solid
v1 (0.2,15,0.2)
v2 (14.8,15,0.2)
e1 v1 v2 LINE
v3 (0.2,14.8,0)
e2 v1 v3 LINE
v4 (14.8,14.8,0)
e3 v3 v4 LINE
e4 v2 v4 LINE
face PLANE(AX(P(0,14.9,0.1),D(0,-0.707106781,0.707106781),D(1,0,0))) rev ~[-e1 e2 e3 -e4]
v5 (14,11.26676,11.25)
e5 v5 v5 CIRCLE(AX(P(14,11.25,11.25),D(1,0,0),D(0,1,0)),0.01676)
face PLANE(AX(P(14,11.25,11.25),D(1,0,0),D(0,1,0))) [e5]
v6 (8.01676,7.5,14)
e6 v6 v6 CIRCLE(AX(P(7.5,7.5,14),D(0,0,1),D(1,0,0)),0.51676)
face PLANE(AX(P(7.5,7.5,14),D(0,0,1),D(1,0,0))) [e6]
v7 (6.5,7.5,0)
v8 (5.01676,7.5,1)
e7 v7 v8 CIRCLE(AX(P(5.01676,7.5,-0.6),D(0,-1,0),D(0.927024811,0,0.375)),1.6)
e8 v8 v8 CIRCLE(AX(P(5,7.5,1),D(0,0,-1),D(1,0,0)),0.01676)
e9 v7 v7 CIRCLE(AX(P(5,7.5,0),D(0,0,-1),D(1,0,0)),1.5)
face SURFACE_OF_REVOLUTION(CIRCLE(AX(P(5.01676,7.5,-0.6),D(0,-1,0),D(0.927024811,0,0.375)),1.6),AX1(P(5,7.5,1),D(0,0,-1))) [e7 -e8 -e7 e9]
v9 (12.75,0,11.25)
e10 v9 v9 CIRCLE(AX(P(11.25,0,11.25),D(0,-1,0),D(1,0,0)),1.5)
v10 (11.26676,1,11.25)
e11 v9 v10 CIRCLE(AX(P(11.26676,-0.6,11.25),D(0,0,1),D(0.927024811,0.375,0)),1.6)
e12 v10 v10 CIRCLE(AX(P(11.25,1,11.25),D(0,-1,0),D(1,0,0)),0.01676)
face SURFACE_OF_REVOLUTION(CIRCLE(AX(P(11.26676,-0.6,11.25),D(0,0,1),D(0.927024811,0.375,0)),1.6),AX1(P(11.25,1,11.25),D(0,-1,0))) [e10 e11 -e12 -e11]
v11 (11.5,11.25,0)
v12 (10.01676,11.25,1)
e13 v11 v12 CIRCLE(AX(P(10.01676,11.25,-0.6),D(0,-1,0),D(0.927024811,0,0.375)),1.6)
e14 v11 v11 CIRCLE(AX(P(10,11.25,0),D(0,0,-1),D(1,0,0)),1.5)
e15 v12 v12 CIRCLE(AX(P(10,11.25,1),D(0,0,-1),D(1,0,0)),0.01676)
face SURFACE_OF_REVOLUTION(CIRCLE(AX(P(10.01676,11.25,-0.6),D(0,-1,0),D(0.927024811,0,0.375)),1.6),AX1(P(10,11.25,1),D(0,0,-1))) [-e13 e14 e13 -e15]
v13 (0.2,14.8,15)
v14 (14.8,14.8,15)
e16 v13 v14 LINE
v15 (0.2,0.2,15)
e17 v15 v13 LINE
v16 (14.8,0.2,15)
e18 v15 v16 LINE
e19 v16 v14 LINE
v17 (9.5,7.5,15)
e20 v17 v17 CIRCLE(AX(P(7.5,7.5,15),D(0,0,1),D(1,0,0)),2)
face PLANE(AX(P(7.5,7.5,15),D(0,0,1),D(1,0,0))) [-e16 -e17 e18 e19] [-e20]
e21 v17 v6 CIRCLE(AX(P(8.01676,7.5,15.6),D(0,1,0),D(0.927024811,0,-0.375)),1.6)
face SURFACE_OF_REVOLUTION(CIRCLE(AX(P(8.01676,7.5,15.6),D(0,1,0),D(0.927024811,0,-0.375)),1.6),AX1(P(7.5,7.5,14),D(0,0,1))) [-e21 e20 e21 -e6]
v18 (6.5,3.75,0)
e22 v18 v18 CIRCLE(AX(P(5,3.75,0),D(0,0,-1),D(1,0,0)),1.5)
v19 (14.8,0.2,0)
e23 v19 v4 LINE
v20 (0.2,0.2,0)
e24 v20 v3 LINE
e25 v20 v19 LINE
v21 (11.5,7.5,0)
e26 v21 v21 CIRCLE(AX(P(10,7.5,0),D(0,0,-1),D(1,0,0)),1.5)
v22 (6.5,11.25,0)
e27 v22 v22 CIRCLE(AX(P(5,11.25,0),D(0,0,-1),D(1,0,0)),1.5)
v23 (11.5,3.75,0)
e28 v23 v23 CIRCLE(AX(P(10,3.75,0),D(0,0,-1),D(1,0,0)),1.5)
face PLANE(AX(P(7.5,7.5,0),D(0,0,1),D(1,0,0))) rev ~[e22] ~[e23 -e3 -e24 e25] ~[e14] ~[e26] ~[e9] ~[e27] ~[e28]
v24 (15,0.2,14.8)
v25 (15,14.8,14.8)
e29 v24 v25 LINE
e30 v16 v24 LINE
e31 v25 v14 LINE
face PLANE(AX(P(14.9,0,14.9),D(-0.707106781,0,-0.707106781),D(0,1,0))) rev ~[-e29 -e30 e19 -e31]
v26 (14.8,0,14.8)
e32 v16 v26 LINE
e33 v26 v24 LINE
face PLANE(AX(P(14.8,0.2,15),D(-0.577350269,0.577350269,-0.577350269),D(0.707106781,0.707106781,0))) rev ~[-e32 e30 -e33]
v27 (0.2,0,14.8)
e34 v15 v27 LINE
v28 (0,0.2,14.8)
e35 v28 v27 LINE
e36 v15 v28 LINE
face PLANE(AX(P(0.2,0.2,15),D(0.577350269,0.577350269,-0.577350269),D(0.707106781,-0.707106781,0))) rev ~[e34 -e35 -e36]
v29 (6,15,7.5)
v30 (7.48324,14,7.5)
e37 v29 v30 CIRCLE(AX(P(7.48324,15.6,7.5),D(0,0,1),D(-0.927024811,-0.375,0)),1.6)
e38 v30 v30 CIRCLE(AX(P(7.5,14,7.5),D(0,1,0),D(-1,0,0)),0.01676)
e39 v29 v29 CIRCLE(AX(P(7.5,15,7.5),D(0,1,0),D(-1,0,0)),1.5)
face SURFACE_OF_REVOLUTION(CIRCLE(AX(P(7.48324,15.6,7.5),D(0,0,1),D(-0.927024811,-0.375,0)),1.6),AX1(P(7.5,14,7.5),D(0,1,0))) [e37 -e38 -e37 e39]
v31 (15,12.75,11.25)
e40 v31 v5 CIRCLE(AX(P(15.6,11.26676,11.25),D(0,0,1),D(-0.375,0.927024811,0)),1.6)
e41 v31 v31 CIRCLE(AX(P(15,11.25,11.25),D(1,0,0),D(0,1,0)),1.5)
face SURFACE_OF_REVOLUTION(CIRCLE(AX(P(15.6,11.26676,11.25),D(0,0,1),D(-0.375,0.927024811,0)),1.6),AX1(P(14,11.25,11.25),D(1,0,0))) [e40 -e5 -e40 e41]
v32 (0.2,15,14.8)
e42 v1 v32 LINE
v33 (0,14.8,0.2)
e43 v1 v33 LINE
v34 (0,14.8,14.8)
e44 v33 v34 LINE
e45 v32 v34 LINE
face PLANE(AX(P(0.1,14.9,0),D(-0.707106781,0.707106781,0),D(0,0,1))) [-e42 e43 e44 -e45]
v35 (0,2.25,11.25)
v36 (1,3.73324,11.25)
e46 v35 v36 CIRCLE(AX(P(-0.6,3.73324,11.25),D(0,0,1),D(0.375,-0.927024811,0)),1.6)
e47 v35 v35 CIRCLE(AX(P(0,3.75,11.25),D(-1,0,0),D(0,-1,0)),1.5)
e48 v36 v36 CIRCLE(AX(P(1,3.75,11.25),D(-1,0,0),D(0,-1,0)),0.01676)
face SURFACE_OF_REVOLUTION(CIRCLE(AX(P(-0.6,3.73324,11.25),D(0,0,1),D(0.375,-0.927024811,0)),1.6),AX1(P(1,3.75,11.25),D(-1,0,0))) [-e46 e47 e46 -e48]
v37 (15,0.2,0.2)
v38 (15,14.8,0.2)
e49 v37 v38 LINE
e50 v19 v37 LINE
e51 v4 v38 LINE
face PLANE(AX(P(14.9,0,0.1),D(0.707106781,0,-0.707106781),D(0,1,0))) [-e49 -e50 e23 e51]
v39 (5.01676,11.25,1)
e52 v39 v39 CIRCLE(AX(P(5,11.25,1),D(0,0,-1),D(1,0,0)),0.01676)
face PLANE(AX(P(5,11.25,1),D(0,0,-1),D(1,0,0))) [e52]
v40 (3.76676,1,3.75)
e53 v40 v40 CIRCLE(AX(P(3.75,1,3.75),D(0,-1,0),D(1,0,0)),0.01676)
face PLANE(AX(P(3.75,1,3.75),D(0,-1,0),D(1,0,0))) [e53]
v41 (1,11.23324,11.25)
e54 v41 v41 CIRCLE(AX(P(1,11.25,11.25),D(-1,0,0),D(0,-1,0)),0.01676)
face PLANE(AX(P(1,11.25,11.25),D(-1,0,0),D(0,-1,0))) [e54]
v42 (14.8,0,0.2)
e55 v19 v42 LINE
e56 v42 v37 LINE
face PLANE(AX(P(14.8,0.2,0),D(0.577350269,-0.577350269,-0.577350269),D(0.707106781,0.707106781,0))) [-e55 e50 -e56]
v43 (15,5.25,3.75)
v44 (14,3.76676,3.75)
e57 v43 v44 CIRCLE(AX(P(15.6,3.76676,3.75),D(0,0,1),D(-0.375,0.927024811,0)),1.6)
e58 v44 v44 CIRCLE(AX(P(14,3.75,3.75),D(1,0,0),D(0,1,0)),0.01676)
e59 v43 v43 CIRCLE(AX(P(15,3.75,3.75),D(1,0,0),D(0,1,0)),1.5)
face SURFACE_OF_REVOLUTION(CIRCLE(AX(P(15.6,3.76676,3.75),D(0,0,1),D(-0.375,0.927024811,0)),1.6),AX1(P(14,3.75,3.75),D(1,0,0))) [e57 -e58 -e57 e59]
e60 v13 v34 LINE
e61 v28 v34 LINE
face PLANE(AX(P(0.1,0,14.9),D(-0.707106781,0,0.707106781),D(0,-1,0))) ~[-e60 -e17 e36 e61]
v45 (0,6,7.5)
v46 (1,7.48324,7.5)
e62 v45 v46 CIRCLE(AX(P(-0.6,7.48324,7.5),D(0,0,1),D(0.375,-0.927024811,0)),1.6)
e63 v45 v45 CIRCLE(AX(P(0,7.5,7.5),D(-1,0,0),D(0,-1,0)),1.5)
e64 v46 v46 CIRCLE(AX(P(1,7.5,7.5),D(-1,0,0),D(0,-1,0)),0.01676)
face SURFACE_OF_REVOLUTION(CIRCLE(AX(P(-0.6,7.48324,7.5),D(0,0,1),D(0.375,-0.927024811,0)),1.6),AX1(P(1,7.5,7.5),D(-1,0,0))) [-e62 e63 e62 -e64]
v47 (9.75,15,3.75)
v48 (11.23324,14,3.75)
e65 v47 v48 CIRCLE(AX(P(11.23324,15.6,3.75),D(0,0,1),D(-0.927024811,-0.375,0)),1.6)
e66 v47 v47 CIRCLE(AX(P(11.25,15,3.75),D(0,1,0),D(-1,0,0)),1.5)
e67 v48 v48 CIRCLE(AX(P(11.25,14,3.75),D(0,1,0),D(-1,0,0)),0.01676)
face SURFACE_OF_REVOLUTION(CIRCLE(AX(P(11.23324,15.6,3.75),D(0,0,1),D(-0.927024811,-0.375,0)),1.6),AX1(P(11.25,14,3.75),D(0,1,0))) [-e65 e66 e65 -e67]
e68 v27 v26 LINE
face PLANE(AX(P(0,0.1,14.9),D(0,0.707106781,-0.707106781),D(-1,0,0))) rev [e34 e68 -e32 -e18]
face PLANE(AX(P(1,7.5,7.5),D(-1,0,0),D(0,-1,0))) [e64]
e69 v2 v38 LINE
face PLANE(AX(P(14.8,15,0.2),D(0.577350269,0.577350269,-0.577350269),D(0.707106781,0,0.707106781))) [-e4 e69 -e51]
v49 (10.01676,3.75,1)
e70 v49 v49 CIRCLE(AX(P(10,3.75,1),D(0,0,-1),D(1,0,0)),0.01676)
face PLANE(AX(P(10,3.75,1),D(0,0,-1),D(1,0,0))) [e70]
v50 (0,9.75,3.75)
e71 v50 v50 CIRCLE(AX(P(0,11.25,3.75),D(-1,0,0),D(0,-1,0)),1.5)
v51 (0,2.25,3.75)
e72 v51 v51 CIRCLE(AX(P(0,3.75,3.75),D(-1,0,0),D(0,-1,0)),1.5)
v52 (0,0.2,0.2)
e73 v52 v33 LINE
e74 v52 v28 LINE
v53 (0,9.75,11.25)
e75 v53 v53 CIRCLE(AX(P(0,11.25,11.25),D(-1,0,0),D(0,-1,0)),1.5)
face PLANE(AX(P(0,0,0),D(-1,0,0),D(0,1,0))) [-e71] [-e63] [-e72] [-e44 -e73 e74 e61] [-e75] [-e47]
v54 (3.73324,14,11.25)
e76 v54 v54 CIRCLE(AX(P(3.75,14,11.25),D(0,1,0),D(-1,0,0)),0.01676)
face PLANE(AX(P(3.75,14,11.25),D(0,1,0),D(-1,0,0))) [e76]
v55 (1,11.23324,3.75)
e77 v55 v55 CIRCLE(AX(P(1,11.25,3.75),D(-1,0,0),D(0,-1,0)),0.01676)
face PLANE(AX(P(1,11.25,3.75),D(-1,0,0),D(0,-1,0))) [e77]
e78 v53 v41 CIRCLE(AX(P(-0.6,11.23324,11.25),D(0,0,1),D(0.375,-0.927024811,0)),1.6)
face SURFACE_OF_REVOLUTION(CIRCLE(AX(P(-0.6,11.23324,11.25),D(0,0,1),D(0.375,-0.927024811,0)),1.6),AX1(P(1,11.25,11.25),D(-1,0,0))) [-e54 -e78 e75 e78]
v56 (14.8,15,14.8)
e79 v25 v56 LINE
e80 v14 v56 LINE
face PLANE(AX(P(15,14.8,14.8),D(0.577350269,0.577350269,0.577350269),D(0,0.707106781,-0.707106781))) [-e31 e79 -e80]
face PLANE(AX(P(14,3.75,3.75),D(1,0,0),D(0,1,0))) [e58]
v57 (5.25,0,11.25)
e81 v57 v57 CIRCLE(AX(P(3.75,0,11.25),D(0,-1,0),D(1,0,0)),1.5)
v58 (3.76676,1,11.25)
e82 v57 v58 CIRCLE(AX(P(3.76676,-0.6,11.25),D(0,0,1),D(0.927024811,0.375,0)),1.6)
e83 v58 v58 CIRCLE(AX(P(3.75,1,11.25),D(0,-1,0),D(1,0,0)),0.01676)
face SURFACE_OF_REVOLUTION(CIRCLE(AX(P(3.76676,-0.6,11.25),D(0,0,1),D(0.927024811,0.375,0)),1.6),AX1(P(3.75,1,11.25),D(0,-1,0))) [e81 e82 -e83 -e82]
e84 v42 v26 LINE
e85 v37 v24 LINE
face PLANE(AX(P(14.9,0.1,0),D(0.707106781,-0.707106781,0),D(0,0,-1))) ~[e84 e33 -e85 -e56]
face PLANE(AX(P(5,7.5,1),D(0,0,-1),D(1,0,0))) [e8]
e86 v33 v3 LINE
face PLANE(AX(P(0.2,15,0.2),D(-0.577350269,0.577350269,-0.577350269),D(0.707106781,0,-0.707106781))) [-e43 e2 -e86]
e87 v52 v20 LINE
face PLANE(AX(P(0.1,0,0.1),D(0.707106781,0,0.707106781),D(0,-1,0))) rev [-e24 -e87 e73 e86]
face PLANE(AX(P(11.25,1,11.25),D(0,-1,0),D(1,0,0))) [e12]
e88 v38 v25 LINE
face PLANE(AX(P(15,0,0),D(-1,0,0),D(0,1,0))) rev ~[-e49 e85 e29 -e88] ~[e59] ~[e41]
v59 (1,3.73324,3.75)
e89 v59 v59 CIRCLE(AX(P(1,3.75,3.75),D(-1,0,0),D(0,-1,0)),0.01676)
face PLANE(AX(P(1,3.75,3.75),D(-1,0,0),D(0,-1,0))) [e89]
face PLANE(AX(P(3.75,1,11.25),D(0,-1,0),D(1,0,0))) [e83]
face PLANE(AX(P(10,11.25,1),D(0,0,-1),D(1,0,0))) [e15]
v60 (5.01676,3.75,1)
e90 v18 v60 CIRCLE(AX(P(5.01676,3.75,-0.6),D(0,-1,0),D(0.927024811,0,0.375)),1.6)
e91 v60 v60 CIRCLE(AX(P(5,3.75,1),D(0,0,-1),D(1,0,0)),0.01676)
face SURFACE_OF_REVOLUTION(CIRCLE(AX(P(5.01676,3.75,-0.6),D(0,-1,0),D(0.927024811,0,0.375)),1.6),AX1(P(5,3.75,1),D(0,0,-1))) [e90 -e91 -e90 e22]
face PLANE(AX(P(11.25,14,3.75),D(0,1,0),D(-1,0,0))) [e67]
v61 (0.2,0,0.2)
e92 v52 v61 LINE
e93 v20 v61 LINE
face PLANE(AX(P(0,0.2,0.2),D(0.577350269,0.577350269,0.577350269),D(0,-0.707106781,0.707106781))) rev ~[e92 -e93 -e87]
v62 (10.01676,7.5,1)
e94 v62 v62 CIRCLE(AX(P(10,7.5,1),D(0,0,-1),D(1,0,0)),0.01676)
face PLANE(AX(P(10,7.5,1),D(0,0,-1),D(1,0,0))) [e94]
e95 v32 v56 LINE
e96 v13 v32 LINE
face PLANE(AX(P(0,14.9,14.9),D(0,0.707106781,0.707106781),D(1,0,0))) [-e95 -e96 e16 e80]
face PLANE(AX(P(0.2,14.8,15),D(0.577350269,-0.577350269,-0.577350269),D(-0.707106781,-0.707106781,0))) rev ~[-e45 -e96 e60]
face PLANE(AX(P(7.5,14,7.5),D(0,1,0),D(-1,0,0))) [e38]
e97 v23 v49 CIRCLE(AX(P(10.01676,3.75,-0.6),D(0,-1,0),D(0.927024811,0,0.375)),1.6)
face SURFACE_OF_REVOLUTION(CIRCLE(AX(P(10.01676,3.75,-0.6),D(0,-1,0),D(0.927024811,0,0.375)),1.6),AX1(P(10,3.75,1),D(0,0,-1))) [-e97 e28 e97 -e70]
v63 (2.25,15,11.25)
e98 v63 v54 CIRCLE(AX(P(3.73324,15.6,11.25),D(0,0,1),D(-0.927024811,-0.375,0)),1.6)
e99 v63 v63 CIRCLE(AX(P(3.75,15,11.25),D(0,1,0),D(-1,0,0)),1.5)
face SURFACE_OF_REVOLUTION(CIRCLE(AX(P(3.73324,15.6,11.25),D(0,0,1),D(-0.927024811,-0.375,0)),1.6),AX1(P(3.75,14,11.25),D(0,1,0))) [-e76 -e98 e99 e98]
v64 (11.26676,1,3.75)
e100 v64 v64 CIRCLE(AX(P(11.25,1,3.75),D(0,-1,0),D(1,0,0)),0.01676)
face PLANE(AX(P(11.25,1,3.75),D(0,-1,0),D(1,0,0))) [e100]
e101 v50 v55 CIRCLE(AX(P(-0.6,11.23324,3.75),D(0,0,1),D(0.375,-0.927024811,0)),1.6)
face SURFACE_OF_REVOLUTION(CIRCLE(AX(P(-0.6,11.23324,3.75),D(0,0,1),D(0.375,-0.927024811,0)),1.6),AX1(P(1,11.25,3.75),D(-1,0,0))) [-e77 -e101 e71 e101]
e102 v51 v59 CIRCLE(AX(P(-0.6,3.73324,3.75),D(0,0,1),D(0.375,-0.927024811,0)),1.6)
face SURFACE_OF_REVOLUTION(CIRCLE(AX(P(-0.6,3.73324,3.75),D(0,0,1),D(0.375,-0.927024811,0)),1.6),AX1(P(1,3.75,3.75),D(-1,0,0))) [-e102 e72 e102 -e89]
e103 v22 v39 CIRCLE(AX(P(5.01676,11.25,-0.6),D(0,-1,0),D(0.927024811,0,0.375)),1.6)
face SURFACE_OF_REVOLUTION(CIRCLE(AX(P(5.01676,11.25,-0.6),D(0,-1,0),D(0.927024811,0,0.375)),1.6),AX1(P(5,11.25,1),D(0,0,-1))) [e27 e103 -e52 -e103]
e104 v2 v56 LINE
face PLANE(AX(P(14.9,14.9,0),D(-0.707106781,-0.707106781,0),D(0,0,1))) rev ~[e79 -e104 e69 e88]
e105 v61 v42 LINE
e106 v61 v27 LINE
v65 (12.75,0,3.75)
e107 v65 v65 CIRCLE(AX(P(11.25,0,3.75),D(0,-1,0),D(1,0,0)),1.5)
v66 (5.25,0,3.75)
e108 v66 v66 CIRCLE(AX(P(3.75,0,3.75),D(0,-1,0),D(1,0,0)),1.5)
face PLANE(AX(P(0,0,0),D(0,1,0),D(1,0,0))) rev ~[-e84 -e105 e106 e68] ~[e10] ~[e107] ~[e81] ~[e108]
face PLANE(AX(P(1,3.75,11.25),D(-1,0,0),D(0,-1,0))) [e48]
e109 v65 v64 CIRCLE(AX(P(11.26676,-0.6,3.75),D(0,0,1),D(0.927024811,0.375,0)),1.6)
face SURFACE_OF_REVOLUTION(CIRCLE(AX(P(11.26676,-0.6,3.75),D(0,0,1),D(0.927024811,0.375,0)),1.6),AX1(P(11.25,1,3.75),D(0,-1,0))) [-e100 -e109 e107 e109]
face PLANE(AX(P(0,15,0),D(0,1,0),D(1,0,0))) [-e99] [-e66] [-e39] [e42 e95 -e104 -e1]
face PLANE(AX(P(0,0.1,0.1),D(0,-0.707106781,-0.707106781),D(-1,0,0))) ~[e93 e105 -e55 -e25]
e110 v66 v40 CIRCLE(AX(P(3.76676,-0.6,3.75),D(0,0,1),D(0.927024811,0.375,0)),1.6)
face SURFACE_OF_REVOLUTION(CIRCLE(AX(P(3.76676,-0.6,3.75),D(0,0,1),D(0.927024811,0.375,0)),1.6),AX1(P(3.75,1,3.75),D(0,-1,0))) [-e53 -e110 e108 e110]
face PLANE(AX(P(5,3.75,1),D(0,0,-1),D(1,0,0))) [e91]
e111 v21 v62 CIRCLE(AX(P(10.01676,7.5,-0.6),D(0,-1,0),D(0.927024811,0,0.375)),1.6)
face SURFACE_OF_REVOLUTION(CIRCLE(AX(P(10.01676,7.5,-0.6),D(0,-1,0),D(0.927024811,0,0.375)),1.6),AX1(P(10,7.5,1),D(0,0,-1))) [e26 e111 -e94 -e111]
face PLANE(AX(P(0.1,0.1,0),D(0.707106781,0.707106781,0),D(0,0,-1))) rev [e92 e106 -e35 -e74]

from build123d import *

# Parameters (mm, degrees)
F0_W      = 15
F0_H      = 15
F1_DEPTH  = 15
F2_R      = 2
F3_DEPTH  = 1
F4_R      = 1.5
F5_DEPTH  = 1
F6_R      = 1.5
F7_DEPTH  = 1
F8_R      = 1.5
F9_DEPTH  = 1
F10_R     = 1.5
F11_DEPTH = 1
F12_R     = 1.5
F13_DEPTH = 1
F15_SIZE  = 0.2


# Not quite as in the source:
# - a fillet or chamfer that OpenCascade refuses, or shapes differently, is made with other operations: its cross-section is extruded or revolved along the edge and cut away or added


with BuildPart() as f1:
    # F0 (on Top) → F1 (new body)
    with BuildSketch(Plane.XY):
        with Locations((7.5, 7.5)):
            Rectangle(F0_W, F0_H)
    extrude(amount=F1_DEPTH)

    # F2 (on face) → F3 (cut)
    with BuildSketch(Plane.XY.offset(15)):
        with Locations((7.5, 7.5)):
            Circle(F2_R)
    extrude(amount=-F3_DEPTH, mode=Mode.SUBTRACT)

    # F4 (on face) → F5 (cut)
    with BuildSketch(Plane(origin=(0, 0, 0), x_dir=(1, 0, 0), z_dir=(0, 0, -1))):
        with Locations((5, -3.75)):
            Circle(F4_R)
        with Locations((10, -3.75)):
            Circle(F4_R)
        with Locations((10, -7.5)):
            Circle(F4_R)
        with Locations((5, -7.5)):
            Circle(F4_R)
        with Locations((5, -11.25)):
            Circle(F4_R)
        with Locations((10, -11.25)):
            Circle(F4_R)
    extrude(amount=-F5_DEPTH, mode=Mode.SUBTRACT)

    # F6 (on face) → F7 (cut)
    with BuildSketch(Plane.YZ.offset(15)):
        with Locations((3.75, 3.75)):
            Circle(F6_R)
        with Locations((11.25, 11.25)):
            Circle(F6_R)
    extrude(amount=-F7_DEPTH, mode=Mode.SUBTRACT)

    # F8 (on face) → F9 (cut)
    with BuildSketch(Plane(origin=(0, 0, 0), x_dir=(0, -1, 0), z_dir=(-1, 0, 0))):
        with Locations((-11.25, 11.25)):
            Circle(F8_R)
        with Locations((-7.5, 7.5)):
            Circle(F8_R)
        with Locations((-11.25, 3.75)):
            Circle(F8_R)
        with Locations((-3.75, 3.75)):
            Circle(F8_R)
        with Locations((-3.75, 11.25)):
            Circle(F8_R)
    extrude(amount=-F9_DEPTH, mode=Mode.SUBTRACT)

    # F10 (on face) → F11 (cut)
    with BuildSketch(Plane(origin=(0, 15, 0), x_dir=(-1, 0, 0), z_dir=(0, 1, 0))):
        with Locations((-3.75, 11.25)):
            Circle(F10_R)
        with Locations((-7.5, 7.5)):
            Circle(F10_R)
        with Locations((-11.25, 3.75)):
            Circle(F10_R)
    extrude(amount=-F11_DEPTH, mode=Mode.SUBTRACT)

    # F12 (on face) → F13 (cut)
    with BuildSketch(Plane.XZ):
        with Locations((3.75, 11.25)):
            Circle(F12_R)
        with Locations((11.25, 11.25)):
            Circle(F12_R)
        with Locations((11.25, 3.75)):
            Circle(F12_R)
        with Locations((3.75, 3.75)):
            Circle(F12_R)
    extrude(amount=-F13_DEPTH, mode=Mode.SUBTRACT)

    # F14: fillet of radius 1.6 on 21 edges, made by hand

    # F14_s1 → F14_t2 (revolve)
    with BuildSketch(Plane.XY.offset(3.75)):
        with BuildLine():
            ThreePointArc((0, 9.75), (0.7266499161, 10.3388125064), (1, 11.2332396974))
            Line((1, 11.2332396974), (1, 9.75))
            Line((1, 9.75), (0, 9.75))
        make_face()
    revolve(axis=Axis((1, 11.25, 3.75), (-1, 0, 0)))

    # F14_s3 → F14_t4 (revolve)
    with BuildSketch(Plane.XY.offset(7.5)):
        with BuildLine():
            ThreePointArc((0, 6), (0.7266499161, 6.5888125064), (1, 7.4832396974))
            Line((1, 7.4832396974), (1, 6))
            Line((1, 6), (0, 6))
        make_face()
    revolve(axis=Axis((1, 7.5, 7.5), (-1, 0, 0)))

    # F14_s5 → F14_t6 (revolve)
    with BuildSketch(Plane.XY.offset(11.25)):
        with BuildLine():
            ThreePointArc((0, 9.75), (0.7266499161, 10.3388125064), (1, 11.2332396974))
            Line((1, 11.2332396974), (1, 9.75))
            Line((1, 9.75), (0, 9.75))
        make_face()
    revolve(axis=Axis((1, 11.25, 11.25), (-1, 0, 0)))

    # F14_s7 → F14_t8 (revolve)
    with BuildSketch(Plane.XY.offset(3.75)):
        with BuildLine():
            ThreePointArc((0, 2.25), (0.7266499161, 2.8388125064), (1, 3.7332396974))
            Line((1, 3.7332396974), (1, 2.25))
            Line((1, 2.25), (0, 2.25))
        make_face()
    revolve(axis=Axis((1, 3.75, 3.75), (-1, 0, 0)))

    # F14_s9 → F14_t10 (revolve)
    with BuildSketch(Plane.XY.offset(11.25)):
        with BuildLine():
            ThreePointArc((0, 2.25), (0.7266499161, 2.8388125064), (1, 3.7332396974))
            Line((1, 3.7332396974), (1, 2.25))
            Line((1, 2.25), (0, 2.25))
        make_face()
    revolve(axis=Axis((1, 3.75, 11.25), (-1, 0, 0)))

    # F14_s11 → F14_t12 (revolve)
    with BuildSketch(Plane.XY.offset(11.25)):
        with BuildLine():
            ThreePointArc((2.25, 15), (2.8388125064, 14.2733500839), (3.7332396974, 14))
            Line((3.7332396974, 14), (2.25, 14))
            Line((2.25, 14), (2.25, 15))
        make_face()
    revolve(axis=Axis((3.75, 14, 11.25), (0, 1, 0)))

    # F14_s13 → F14_t14 (revolve)
    with BuildSketch(Plane.XY.offset(7.5)):
        with BuildLine():
            ThreePointArc((6, 15), (6.5888125064, 14.2733500839), (7.4832396974, 14))
            Line((7.4832396974, 14), (6, 14))
            Line((6, 14), (6, 15))
        make_face()
    revolve(axis=Axis((7.5, 14, 7.5), (0, 1, 0)))

    # F14_s15 → F14_t16 (revolve)
    with BuildSketch(Plane.XY.offset(3.75)):
        with BuildLine():
            ThreePointArc((9.75, 15), (10.3388125064, 14.2733500839), (11.2332396974, 14))
            Line((11.2332396974, 14), (9.75, 14))
            Line((9.75, 14), (9.75, 15))
        make_face()
    revolve(axis=Axis((11.25, 14, 3.75), (0, 1, 0)))

    # F14_s17 → F14_t18 (revolve)
    with BuildSketch(Plane.XZ.offset(-11.25)):
        with BuildLine():
            ThreePointArc((11.5, 0), (10.9111874936, 0.7266499161), (10.0167603026, 1))
            Line((10.0167603026, 1), (11.5, 1))
            Line((11.5, 1), (11.5, 0))
        make_face()
    revolve(axis=Axis((10, 11.25, 1), (0, 0, -1)))

    # F14_s19 → F14_t20 (revolve)
    with BuildSketch(Plane.XZ.offset(-7.5)):
        with BuildLine():
            ThreePointArc((11.5, 0), (10.9111874936, 0.7266499161), (10.0167603026, 1))
            Line((10.0167603026, 1), (11.5, 1))
            Line((11.5, 1), (11.5, 0))
        make_face()
    revolve(axis=Axis((10, 7.5, 1), (0, 0, -1)))

    # F14_s21 → F14_t22 (revolve)
    with BuildSketch(Plane.XZ.offset(-11.25)):
        with BuildLine():
            ThreePointArc((6.5, 0), (5.9111874936, 0.7266499161), (5.0167603026, 1))
            Line((5.0167603026, 1), (6.5, 1))
            Line((6.5, 1), (6.5, 0))
        make_face()
    revolve(axis=Axis((5, 11.25, 1), (0, 0, -1)))

    # F14_s23 → F14_t24 (revolve)
    with BuildSketch(Plane.XZ.offset(-7.5)):
        with BuildLine():
            ThreePointArc((6.5, 0), (5.9111874936, 0.7266499161), (5.0167603026, 1))
            Line((5.0167603026, 1), (6.5, 1))
            Line((6.5, 1), (6.5, 0))
        make_face()
    revolve(axis=Axis((5, 7.5, 1), (0, 0, -1)))

    # F14_s25 → F14_t26 (revolve)
    with BuildSketch(Plane.XZ.offset(-3.75)):
        with BuildLine():
            ThreePointArc((6.5, 0), (5.9111874936, 0.7266499161), (5.0167603026, 1))
            Line((5.0167603026, 1), (6.5, 1))
            Line((6.5, 1), (6.5, 0))
        make_face()
    revolve(axis=Axis((5, 3.75, 1), (0, 0, -1)))

    # F14_s27 → F14_t28 (revolve)
    with BuildSketch(Plane.XZ.offset(-3.75)):
        with BuildLine():
            ThreePointArc((11.5, 0), (10.9111874936, 0.7266499161), (10.0167603026, 1))
            Line((10.0167603026, 1), (11.5, 1))
            Line((11.5, 1), (11.5, 0))
        make_face()
    revolve(axis=Axis((10, 3.75, 1), (0, 0, -1)))

    # F14_s29 → F14_t30 (revolve)
    with BuildSketch(Plane.XY.offset(3.75)):
        with BuildLine():
            ThreePointArc((15, 5.25), (14.2733500839, 4.6611874936), (14, 3.7667603026))
            Line((14, 3.7667603026), (14, 5.25))
            Line((14, 5.25), (15, 5.25))
        make_face()
    revolve(axis=Axis((14, 3.75, 3.75), (1, 0, 0)))

    # F14_s31 → F14_t32 (revolve)
    with BuildSketch(Plane.XY.offset(11.25)):
        with BuildLine():
            ThreePointArc((15, 12.75), (14.2733500839, 12.1611874936), (14, 11.2667603026))
            Line((14, 11.2667603026), (14, 12.75))
            Line((14, 12.75), (15, 12.75))
        make_face()
    revolve(axis=Axis((14, 11.25, 11.25), (1, 0, 0)))

    # F14_s33 → F14_t34 (revolve)
    with BuildSketch(Plane.XZ.offset(-7.5)):
        with BuildLine():
            ThreePointArc((9.5, 15), (8.9111874936, 14.2733500839), (8.0167603026, 14))
            Line((8.0167603026, 14), (9.5, 14))
            Line((9.5, 14), (9.5, 15))
        make_face()
    revolve(axis=Axis((7.5, 7.5, 14), (0, 0, 1)))

    # F14_s35 → F14_t36 (revolve)
    with BuildSketch(Plane.XY.offset(11.25)):
        with BuildLine():
            ThreePointArc((5.25, 0), (4.6611874936, 0.7266499161), (3.7667603026, 1))
            Line((3.7667603026, 1), (5.25, 1))
            Line((5.25, 1), (5.25, 0))
        make_face()
    revolve(axis=Axis((3.75, 1, 11.25), (0, -1, 0)))

    # F14_s37 → F14_t38 (revolve)
    with BuildSketch(Plane.XY.offset(11.25)):
        with BuildLine():
            ThreePointArc((12.75, 0), (12.1611874936, 0.7266499161), (11.2667603026, 1))
            Line((11.2667603026, 1), (12.75, 1))
            Line((12.75, 1), (12.75, 0))
        make_face()
    revolve(axis=Axis((11.25, 1, 11.25), (0, -1, 0)))

    # F14_s39 → F14_t40 (revolve)
    with BuildSketch(Plane.XY.offset(3.75)):
        with BuildLine():
            ThreePointArc((12.75, 0), (12.1611874936, 0.7266499161), (11.2667603026, 1))
            Line((11.2667603026, 1), (12.75, 1))
            Line((12.75, 1), (12.75, 0))
        make_face()
    revolve(axis=Axis((11.25, 1, 3.75), (0, -1, 0)))

    # F14_s41 → F14_t42 (revolve)
    with BuildSketch(Plane.XY.offset(3.75)):
        with BuildLine():
            ThreePointArc((5.25, 0), (4.6611874936, 0.7266499161), (3.7667603026, 1))
            Line((3.7667603026, 1), (5.25, 1))
            Line((5.25, 1), (5.25, 0))
        make_face()
    revolve(axis=Axis((3.75, 1, 3.75), (0, -1, 0)))

    # F15
    f15_edges = [f1.edges().sort_by_distance(p)[0] for p in [
        (15, 0, 7.5),
        (7.5, 0, 0),
        (15, 7.5, 0),
        (0, 7.5, 0),
        (0, 0, 7.5),
        (0, 15, 7.5),
        (7.5, 15, 0),
        (7.5, 15, 15),
        (0, 7.5, 15),
        (7.5, 0, 15),
        (15, 7.5, 15),
        (15, 15, 7.5),
    ]]
    chamfer(f15_edges, length=F15_SIZE)


solid = f1.part
